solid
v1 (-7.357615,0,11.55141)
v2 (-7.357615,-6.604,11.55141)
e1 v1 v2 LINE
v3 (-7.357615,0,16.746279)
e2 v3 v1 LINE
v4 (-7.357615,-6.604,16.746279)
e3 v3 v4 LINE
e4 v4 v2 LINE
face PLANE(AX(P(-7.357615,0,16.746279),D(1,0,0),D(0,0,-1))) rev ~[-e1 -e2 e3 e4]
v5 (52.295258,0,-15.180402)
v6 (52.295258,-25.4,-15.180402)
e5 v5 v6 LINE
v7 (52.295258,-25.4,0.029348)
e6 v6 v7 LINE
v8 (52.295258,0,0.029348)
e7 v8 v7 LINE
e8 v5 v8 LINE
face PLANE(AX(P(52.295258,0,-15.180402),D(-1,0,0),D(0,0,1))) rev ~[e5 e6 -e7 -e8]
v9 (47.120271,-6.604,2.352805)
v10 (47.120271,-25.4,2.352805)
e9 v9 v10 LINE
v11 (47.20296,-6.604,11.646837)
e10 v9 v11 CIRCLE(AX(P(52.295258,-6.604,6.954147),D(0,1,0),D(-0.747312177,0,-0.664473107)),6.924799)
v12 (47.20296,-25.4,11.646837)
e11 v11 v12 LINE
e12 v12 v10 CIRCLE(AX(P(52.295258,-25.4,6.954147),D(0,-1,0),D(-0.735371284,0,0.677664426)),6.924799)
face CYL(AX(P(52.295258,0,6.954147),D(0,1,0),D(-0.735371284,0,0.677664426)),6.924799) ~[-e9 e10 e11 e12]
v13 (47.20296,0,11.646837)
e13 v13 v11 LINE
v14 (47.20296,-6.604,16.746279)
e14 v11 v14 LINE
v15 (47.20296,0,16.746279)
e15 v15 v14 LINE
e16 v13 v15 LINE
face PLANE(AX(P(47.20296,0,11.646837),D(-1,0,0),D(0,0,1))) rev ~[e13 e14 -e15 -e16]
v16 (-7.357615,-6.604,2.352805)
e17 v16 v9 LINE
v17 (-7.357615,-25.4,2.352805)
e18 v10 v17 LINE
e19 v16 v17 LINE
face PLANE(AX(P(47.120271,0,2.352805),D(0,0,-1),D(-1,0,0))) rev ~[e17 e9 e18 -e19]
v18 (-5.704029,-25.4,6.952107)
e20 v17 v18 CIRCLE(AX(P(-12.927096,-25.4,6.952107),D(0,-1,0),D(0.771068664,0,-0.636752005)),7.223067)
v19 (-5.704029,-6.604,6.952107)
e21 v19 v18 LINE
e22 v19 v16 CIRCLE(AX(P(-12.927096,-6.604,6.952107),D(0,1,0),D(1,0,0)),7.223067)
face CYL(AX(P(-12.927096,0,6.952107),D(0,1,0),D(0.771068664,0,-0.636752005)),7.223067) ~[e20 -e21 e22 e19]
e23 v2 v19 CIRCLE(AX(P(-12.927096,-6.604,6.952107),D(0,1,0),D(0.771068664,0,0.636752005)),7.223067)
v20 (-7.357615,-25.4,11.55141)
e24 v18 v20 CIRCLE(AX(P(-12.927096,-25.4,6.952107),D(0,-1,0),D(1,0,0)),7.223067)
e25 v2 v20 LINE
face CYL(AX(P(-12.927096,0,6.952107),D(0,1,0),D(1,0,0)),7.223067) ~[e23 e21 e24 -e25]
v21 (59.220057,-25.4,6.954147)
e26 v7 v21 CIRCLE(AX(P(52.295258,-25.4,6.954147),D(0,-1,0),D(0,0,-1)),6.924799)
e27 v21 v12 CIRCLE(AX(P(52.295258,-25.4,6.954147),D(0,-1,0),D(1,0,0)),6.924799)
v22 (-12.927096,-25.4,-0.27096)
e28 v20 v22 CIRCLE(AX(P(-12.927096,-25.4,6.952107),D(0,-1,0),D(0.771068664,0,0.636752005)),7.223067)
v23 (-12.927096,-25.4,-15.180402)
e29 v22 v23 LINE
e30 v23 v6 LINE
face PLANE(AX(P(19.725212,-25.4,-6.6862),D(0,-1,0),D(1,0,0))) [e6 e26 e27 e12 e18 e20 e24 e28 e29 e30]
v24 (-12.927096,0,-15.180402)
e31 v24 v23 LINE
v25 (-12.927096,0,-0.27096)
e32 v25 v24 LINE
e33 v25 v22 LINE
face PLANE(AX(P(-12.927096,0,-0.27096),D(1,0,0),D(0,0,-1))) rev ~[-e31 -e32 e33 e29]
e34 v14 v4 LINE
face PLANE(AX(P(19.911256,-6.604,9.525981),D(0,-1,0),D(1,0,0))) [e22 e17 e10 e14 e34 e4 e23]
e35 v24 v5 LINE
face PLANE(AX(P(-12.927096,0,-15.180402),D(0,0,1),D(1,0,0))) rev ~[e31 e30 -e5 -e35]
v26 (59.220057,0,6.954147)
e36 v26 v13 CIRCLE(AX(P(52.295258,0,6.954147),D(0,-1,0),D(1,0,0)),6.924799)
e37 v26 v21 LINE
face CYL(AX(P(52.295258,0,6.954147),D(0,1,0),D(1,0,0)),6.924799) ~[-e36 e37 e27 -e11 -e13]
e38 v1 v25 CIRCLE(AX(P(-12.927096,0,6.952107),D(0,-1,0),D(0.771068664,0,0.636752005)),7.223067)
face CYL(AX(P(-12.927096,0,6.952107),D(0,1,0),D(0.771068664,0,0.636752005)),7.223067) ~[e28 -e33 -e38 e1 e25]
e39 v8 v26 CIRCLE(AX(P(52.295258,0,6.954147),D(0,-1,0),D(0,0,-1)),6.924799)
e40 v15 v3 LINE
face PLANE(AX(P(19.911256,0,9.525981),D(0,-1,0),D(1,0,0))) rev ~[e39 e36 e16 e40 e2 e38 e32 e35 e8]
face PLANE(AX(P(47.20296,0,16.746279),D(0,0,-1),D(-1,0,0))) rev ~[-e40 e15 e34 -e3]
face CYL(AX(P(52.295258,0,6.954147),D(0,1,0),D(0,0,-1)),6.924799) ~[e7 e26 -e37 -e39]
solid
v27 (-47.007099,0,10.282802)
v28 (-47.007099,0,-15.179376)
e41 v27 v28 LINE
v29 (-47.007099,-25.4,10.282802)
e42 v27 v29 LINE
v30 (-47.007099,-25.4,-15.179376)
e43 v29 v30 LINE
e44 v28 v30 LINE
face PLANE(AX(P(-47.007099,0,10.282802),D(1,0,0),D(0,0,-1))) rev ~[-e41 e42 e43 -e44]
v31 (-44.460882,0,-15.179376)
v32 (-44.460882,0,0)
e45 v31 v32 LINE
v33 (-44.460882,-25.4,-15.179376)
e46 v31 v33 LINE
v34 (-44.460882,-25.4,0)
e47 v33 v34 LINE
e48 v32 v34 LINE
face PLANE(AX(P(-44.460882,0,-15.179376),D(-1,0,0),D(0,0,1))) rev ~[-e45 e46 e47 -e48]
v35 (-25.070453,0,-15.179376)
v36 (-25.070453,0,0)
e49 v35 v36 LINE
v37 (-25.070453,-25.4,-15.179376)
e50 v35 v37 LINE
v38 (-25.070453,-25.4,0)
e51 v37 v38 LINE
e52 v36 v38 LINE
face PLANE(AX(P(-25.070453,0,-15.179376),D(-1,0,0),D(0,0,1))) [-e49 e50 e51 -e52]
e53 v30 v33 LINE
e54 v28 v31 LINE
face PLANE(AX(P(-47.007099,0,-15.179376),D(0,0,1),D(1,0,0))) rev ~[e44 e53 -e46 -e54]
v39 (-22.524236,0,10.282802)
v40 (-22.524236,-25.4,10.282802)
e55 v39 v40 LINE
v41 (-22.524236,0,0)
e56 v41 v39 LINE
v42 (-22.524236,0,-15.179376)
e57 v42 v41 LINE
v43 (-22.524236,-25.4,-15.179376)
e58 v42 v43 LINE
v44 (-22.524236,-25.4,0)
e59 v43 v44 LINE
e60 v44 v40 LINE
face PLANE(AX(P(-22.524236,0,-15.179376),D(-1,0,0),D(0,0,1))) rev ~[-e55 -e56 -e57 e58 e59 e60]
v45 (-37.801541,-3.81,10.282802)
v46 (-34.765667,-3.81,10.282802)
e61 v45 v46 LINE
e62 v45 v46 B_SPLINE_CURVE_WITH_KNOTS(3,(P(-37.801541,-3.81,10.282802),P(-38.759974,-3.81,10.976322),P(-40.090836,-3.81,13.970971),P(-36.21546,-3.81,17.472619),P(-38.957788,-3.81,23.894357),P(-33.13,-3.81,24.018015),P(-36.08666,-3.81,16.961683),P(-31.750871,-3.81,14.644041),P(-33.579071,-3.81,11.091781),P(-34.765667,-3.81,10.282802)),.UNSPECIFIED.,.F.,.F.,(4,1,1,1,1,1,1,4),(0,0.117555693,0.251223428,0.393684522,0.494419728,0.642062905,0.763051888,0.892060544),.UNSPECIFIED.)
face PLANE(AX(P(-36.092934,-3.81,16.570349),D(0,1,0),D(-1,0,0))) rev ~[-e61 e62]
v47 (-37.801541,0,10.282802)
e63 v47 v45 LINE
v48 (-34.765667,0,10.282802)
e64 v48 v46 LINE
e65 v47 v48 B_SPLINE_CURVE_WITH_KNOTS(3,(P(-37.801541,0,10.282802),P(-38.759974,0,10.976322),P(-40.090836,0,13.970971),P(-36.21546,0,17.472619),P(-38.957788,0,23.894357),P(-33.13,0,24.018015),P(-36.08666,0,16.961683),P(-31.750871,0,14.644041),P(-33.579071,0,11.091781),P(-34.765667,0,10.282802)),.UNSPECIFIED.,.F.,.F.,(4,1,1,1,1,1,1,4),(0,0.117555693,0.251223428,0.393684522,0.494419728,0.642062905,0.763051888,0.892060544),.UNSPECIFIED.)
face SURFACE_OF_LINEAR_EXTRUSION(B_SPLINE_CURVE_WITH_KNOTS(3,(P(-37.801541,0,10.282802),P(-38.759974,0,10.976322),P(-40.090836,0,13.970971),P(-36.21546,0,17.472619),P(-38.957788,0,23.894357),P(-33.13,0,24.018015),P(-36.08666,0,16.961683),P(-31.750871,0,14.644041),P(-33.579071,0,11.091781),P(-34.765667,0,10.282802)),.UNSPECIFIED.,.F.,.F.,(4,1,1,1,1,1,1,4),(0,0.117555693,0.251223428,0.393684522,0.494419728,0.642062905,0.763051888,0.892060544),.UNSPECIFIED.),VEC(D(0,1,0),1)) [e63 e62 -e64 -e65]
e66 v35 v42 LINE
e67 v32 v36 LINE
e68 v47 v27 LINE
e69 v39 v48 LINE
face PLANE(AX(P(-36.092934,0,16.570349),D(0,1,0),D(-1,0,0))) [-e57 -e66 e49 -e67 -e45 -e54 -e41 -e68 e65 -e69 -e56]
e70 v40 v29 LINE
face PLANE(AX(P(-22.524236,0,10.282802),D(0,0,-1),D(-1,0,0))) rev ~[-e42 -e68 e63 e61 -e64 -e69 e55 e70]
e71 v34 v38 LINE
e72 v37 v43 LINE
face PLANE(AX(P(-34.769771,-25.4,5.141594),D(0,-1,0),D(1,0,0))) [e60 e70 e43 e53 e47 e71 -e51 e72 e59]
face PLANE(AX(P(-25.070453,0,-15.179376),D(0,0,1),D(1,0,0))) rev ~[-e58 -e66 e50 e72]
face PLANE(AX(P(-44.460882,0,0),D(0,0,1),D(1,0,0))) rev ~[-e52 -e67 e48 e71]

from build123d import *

# Parameters (mm, degrees)
F1_DEPTH = 25.4
F0_W     = 2.5462172925
F0_H     = 15.1793761179
F2_DEPTH = 6.604
F3_DEPTH = 3.81


with BuildPart() as f1:
    # F0 (on Front) → F1 (new body)
    with BuildSketch(Plane.XZ):
        with BuildLine():
            Line((-12.9270958542, -0.2709600874), (-12.9270958542, -15.1804022908))
            Line((-12.9270958542, -15.1804022908), (52.2952577884, -15.1804022908))
            Line((52.2952577884, -15.1804022908), (52.2952577884, 0.0293483804))
            ThreePointArc((52.2952577884, 0.0293483804), (49.4589338856, 0.636860971), (47.1202713733, 2.3528045839))
            Line((47.1202713733, 2.3528045839), (-7.3576150934, 2.3528045839))
            ThreePointArc((-7.3576150934, 2.3528045839), (-9.8488147999, 0.4178217266), (-12.9270958542, -0.2709600874))
        make_face()
        with BuildLine():
            ThreePointArc((-7.3576150934, 11.5514096105), (-19.4613812248, 10.0303881514), (-12.9270958542, -0.2709600874))
            ThreePointArc((-12.9270958542, -0.2709600874), (-9.8488147999, 0.4178217266), (-7.3576150934, 2.3528045839))
            ThreePointArc((-7.3576150934, 2.3528045839), (-6.1299849505, 4.5083430093), (-5.7040286695, 6.9521070972))
            ThreePointArc((-5.7040286695, 6.9521070972), (-6.1299849505, 9.3958711851), (-7.3576150934, 11.5514096105))
        make_face()
        with BuildLine():
            ThreePointArc((47.1202713733, 2.3528045839), (49.4589338856, 0.636860971), (52.2952577884, 0.0293483804))
            ThreePointArc((52.2952577884, 0.0293483804), (57.1918299275, 2.0575749696), (59.2200565167, 6.9541471087))
            ThreePointArc((59.2200565167, 6.9541471087), (54.8141561389, 13.4045725618), (47.2029596567, 11.6468368667))
            ThreePointArc((47.2029596567, 11.6468368667), (45.3707331109, 7.015754067), (47.1202713733, 2.3528045839))
        make_face()
    extrude(amount=F1_DEPTH)

    # F0 (on Front) → F2 (join)
    with BuildSketch(Plane.XZ):
        with BuildLine():
            Line((-7.3576150934, 16.7462788522), (-7.3576150934, 11.5514096105))
            ThreePointArc((-7.3576150934, 11.5514096105), (-6.1299849505, 9.3958711851), (-5.7040286695, 6.9521070972))
            ThreePointArc((-5.7040286695, 6.9521070972), (-6.1299849505, 4.5083430093), (-7.3576150934, 2.3528045839))
            Line((-7.3576150934, 2.3528045839), (47.1202713733, 2.3528045839))
            ThreePointArc((47.1202713733, 2.3528045839), (45.3707331109, 7.015754067), (47.2029596567, 11.6468368667))
            Line((47.2029596567, 11.6468368667), (47.2029596567, 16.7462788522))
            Line((47.2029596567, 16.7462788522), (-7.3576150934, 16.7462788522))
        make_face()
    extrude(amount=F2_DEPTH)


with BuildPart() as f1b:
    # F0 (on Front) → F1, piece 2 (new body)
    with BuildSketch(Plane.XZ):
        with BuildLine():
            Line((-37.801541388, 10.2828023955), (-47.007098794, 10.2828023955))
            Line((-47.007098794, 10.2828023955), (-47.007098794, 0))
            Line((-47.007098794, 0), (-44.4608815014, 0))
            Line((-44.4608815014, 0), (-25.0704530627, 0))
            Line((-25.0704530627, 0), (-22.5242357701, 0))
            Line((-22.5242357701, 0), (-22.5242357701, 10.2828023955))
            Line((-22.5242357701, 10.2828023955), (-34.765667282, 10.2828023955))
            add(Edge.make_bspline(
                [(-34.765667282, 10.2828023955), (-35.7584733948, 9.6059430556), (-36.9215104066, 9.6460140673), (-37.801541388, 10.2828023955)],
                knots=[0.8920605443, 0.8920605443, 0.8920605443, 0.8920605443, 1, 1, 1, 1], degree=3))
        make_face()
        with BuildLine():
            Line((-34.765667282, 10.2828023955), (-37.801541388, 10.2828023955))
            add(Edge.make_bspline(
                [(-34.765667282, 10.2828023955), (-35.7584733948, 9.6059430556), (-36.9215104066, 9.6460140673), (-37.801541388, 10.2828023955)],
                knots=[0.8920605443, 0.8920605443, 0.8920605443, 0.8920605443, 1, 1, 1, 1], degree=3))
        make_face()
        with Locations((-45.7339901477, -7.5896880589)):
            Rectangle(F0_W, F0_H)
        with Locations((-23.7973444164, -7.5896880589)):
            Rectangle(F0_W, F0_H)
    extrude(amount=F1_DEPTH)

    # F0 (on Front) → F3 (join)
    with BuildSketch(Plane.XZ):
        with BuildLine():
            add(Edge.make_bspline(
                [(-37.801541388, 10.2828023955), (-38.7599736077, 10.9763216736), (-40.0908364875, 13.9709710064), (-36.2154597414, 17.4726187492), (-38.9577883228, 23.8943574963), (-33.1299998967, 24.0180152523), (-36.0866597264, 16.9616831482), (-31.7508708707, 14.6440412886), (-33.5790707592, 11.0917810359), (-34.765667282, 10.2828023955)],
                knots=[0, 0, 0, 0, 0.1175556933, 0.2512234277, 0.3936845222, 0.4944197281, 0.6420629054, 0.7630518878, 0.8920605443, 0.8920605443, 0.8920605443, 0.8920605443], degree=3))
            Line((-37.801541388, 10.2828023955), (-34.765667282, 10.2828023955))
        make_face()
        with BuildLine():
            Line((-34.765667282, 10.2828023955), (-37.801541388, 10.2828023955))
            add(Edge.make_bspline(
                [(-34.765667282, 10.2828023955), (-35.7584733948, 9.6059430556), (-36.9215104066, 9.6460140673), (-37.801541388, 10.2828023955)],
                knots=[0.8920605443, 0.8920605443, 0.8920605443, 0.8920605443, 1, 1, 1, 1], degree=3))
        make_face()
    extrude(amount=F3_DEPTH)


solid = Compound([f1.part, f1b.part])
